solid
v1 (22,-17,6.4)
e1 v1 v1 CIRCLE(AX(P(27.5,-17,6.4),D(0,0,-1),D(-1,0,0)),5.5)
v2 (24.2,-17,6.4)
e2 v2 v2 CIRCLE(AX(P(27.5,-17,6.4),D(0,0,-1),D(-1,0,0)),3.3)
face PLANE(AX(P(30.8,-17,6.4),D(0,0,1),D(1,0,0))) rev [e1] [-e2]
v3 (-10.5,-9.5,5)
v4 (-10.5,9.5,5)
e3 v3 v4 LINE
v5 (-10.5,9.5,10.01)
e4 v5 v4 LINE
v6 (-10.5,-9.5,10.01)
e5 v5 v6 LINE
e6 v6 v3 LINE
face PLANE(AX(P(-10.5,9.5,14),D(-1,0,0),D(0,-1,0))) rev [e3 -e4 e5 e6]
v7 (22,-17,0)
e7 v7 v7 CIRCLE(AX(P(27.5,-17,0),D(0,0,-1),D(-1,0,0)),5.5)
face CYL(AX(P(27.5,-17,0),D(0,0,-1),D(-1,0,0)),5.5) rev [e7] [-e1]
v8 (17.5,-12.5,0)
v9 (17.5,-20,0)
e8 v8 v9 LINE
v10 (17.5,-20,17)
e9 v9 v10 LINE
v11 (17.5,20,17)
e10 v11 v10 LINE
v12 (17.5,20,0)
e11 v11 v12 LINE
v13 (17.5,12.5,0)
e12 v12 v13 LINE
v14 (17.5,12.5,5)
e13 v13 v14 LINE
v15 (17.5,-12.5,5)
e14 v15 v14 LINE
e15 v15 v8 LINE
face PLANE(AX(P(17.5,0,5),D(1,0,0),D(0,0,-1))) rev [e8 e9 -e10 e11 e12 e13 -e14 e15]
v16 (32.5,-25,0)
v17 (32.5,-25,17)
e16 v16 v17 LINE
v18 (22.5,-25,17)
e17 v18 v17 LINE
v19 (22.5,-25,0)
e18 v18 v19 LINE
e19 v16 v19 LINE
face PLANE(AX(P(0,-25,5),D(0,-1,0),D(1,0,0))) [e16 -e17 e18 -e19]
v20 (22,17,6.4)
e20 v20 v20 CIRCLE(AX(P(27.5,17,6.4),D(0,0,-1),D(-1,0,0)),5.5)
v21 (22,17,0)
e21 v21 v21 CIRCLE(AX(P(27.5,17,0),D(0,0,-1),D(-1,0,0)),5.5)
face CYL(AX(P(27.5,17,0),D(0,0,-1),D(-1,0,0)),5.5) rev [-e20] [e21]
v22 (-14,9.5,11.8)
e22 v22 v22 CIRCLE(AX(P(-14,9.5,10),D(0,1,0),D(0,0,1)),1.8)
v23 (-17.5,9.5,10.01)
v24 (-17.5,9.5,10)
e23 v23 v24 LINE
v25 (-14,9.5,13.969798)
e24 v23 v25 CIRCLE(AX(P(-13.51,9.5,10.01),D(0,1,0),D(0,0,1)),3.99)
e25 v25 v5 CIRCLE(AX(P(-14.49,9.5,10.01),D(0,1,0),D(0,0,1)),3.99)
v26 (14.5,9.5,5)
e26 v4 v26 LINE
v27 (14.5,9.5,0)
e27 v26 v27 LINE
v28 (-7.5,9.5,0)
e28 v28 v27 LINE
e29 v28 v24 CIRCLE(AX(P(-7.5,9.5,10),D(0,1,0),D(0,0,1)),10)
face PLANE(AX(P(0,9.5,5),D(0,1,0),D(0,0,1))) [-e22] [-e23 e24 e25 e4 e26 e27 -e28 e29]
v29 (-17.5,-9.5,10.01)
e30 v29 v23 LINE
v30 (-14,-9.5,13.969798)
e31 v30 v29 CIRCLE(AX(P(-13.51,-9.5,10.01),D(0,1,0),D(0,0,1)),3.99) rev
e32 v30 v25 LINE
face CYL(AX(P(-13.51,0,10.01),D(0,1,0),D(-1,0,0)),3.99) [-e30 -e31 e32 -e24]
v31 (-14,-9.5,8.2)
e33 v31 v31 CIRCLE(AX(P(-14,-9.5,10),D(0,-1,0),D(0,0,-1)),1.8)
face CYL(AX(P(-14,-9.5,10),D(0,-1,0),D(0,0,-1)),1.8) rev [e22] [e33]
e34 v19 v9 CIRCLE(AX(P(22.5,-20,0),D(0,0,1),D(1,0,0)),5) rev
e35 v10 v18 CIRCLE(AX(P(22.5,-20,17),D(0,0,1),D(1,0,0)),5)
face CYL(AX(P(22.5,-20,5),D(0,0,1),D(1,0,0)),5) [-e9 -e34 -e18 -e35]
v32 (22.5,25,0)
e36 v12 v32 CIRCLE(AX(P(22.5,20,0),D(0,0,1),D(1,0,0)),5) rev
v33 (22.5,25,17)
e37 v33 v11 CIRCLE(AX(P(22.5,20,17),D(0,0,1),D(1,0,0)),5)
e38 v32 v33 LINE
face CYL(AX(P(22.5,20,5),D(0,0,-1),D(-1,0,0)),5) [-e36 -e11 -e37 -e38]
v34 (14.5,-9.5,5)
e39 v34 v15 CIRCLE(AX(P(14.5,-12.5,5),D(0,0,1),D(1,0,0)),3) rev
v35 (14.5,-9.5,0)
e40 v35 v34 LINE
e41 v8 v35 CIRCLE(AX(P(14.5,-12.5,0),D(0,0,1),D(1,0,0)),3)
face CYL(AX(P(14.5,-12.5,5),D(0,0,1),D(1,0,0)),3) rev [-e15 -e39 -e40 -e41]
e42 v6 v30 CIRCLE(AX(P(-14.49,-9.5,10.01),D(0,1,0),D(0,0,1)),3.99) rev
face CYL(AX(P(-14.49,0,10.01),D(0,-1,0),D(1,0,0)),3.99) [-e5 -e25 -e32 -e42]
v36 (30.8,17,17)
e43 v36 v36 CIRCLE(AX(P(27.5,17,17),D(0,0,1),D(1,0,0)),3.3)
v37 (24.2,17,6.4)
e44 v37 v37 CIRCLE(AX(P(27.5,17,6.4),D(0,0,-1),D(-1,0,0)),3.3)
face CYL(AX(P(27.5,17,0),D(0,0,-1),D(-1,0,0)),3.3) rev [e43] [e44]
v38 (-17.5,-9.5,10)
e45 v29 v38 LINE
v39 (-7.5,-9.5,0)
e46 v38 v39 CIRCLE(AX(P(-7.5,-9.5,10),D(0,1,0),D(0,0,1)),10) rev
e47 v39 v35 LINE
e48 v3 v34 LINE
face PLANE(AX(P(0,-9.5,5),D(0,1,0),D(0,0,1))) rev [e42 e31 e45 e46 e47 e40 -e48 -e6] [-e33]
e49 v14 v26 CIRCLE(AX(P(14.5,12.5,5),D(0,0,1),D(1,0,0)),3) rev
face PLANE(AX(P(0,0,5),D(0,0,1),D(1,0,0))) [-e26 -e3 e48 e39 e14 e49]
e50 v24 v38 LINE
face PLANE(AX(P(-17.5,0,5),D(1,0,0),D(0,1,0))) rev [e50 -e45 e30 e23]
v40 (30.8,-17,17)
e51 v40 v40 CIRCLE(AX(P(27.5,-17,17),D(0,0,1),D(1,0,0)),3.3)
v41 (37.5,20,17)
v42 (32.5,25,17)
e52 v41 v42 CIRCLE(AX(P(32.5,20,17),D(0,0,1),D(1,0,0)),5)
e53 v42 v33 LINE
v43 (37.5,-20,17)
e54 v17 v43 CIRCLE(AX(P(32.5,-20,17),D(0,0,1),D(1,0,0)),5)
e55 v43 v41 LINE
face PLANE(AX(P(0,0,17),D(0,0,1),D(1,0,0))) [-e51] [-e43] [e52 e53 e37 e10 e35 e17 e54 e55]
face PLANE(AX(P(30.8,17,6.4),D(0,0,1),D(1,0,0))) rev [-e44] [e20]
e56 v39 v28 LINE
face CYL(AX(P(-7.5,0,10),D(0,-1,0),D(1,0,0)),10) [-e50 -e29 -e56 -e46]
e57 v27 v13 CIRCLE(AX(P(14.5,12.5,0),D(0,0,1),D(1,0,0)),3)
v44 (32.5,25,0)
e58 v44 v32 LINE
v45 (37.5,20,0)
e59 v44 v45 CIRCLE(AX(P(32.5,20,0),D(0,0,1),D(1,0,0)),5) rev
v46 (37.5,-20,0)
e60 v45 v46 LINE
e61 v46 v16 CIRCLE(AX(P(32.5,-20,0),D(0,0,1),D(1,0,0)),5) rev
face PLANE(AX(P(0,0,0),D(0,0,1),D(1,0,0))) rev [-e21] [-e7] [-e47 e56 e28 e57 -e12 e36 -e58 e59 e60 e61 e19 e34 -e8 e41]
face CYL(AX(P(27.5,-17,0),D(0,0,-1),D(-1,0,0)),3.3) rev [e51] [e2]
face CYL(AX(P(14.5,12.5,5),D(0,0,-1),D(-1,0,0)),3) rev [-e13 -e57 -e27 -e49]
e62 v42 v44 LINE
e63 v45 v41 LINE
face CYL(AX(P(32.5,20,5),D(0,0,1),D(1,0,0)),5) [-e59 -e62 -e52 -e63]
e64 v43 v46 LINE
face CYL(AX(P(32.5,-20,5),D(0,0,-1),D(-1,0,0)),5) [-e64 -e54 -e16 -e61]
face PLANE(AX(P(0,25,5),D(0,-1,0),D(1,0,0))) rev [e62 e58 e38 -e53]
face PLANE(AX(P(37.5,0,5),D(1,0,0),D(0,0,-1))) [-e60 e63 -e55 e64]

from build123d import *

# Parameters (mm, degrees)
BASE_SKETCH_W           = 35
BASE_SKETCH_H           = 19
BASE_DEPTH              = 5
HINGE_SKETCH_W          = 7
HINGE_SKETCH_H          = 19
HINGE_BODY_DEPTH        = 9
HINGE_HOLE_D            = 3.6
DOOR_BODY_SKETCH_W      = 20
DOOR_BODY_SKETCH_H      = 50
DOOR_BODY_DEPTH         = 12
DOOR_SCREWS_D           = 6.6
DOOR_SCREWS_CBORE_D     = 11
DOOR_SCREWS_CBORE_DEPTH = 6.4
HINGE_ROUND_R           = 3.99
HINGE_BODY_ROUND_R      = 10
DOOR_CORNERS_ROUND_R    = 5
DOOR_BODY_LINE_R        = 3


with BuildPart() as part:
    # Base sketch → Base (new body)
    with BuildSketch(Plane.XY):
        Rectangle(BASE_SKETCH_W, BASE_SKETCH_H)
        Polygon((17.5, 25), (17.5, 9.5), (17.5, -9.5), (17.5, -25), (37.5, -25), (37.5, 25), align=None)
    extrude(amount=BASE_DEPTH)

    # Hinge sketch → Hinge body (add)
    with BuildSketch(Plane.XY.offset(5)):
        with Locations((-14, 0)):
            Rectangle(HINGE_SKETCH_W, HINGE_SKETCH_H)
    extrude(amount=HINGE_BODY_DEPTH)

    # Hinge hole (through all)
    with Locations(Plane(origin=(0, -9.5, 0), x_dir=(-1, 0, 0), z_dir=(0, -1, 0))):
        with Locations((14, -10)):
            Hole(HINGE_HOLE_D / 2)

    # Door body sketch → Door body (add)
    with BuildSketch(Plane.XY.offset(5)):
        with Locations((27.5, 0)):
            Rectangle(DOOR_BODY_SKETCH_W, DOOR_BODY_SKETCH_H)
    extrude(amount=DOOR_BODY_DEPTH)

    # Door screws (through all)
    with Locations(Plane(origin=(0, 0, 0), x_dir=(-1, 0, 0), z_dir=(0, 0, -1))):
        with Locations((-27.5, 17), (-27.5, -17)):
            CounterBoreHole(DOOR_SCREWS_D / 2, DOOR_SCREWS_CBORE_D / 2, DOOR_SCREWS_CBORE_DEPTH)

    # Hinge round
    # the kernel refuses this fillet: 3.99 mm, written as the material it takes off along each edge
    with BuildSketch(Plane(origin=(-17.5, -19.475, 14), x_dir=(0, 0, -1), z_dir=(0, 1, 0)), Plane(origin=(-10.5, 19.475, 14), x_dir=(0, 0, -1), z_dir=(0, -1, 0))) as hinge_round_piece_1:
        with BuildLine():
            CenterArc((HINGE_ROUND_R, -HINGE_ROUND_R), HINGE_ROUND_R, 90, 90)
            Line((0, -HINGE_ROUND_R), (0, 0))
            Line((0, 0), (HINGE_ROUND_R, 0))
        make_face()
    extrude(amount=38.95, mode=Mode.SUBTRACT)

    # Hinge body round
    hinge_body_round_edges = [part.edges().sort_by_distance(p)[0] for p in [
        (-17.5, 0, 0),
    ]]
    fillet(hinge_body_round_edges, radius=HINGE_BODY_ROUND_R)

    # Door corners round
    door_corners_round_edges = [part.edges().sort_by_distance(p)[0] for p in [
        (17.5, 25, 8.5),
        (37.5, 25, 8.5),
        (37.5, -25, 8.5),
        (17.5, -25, 8.5),
    ]]
    fillet(door_corners_round_edges, radius=DOOR_CORNERS_ROUND_R)

    # Door body line
    door_body_line_edges = [part.edges().sort_by_distance(p)[0] for p in [
        (17.5, 9.5, 2.5),
        (17.5, -9.5, 2.5),
    ]]
    fillet(door_body_line_edges, radius=DOOR_BODY_LINE_R)


solid = part.part
